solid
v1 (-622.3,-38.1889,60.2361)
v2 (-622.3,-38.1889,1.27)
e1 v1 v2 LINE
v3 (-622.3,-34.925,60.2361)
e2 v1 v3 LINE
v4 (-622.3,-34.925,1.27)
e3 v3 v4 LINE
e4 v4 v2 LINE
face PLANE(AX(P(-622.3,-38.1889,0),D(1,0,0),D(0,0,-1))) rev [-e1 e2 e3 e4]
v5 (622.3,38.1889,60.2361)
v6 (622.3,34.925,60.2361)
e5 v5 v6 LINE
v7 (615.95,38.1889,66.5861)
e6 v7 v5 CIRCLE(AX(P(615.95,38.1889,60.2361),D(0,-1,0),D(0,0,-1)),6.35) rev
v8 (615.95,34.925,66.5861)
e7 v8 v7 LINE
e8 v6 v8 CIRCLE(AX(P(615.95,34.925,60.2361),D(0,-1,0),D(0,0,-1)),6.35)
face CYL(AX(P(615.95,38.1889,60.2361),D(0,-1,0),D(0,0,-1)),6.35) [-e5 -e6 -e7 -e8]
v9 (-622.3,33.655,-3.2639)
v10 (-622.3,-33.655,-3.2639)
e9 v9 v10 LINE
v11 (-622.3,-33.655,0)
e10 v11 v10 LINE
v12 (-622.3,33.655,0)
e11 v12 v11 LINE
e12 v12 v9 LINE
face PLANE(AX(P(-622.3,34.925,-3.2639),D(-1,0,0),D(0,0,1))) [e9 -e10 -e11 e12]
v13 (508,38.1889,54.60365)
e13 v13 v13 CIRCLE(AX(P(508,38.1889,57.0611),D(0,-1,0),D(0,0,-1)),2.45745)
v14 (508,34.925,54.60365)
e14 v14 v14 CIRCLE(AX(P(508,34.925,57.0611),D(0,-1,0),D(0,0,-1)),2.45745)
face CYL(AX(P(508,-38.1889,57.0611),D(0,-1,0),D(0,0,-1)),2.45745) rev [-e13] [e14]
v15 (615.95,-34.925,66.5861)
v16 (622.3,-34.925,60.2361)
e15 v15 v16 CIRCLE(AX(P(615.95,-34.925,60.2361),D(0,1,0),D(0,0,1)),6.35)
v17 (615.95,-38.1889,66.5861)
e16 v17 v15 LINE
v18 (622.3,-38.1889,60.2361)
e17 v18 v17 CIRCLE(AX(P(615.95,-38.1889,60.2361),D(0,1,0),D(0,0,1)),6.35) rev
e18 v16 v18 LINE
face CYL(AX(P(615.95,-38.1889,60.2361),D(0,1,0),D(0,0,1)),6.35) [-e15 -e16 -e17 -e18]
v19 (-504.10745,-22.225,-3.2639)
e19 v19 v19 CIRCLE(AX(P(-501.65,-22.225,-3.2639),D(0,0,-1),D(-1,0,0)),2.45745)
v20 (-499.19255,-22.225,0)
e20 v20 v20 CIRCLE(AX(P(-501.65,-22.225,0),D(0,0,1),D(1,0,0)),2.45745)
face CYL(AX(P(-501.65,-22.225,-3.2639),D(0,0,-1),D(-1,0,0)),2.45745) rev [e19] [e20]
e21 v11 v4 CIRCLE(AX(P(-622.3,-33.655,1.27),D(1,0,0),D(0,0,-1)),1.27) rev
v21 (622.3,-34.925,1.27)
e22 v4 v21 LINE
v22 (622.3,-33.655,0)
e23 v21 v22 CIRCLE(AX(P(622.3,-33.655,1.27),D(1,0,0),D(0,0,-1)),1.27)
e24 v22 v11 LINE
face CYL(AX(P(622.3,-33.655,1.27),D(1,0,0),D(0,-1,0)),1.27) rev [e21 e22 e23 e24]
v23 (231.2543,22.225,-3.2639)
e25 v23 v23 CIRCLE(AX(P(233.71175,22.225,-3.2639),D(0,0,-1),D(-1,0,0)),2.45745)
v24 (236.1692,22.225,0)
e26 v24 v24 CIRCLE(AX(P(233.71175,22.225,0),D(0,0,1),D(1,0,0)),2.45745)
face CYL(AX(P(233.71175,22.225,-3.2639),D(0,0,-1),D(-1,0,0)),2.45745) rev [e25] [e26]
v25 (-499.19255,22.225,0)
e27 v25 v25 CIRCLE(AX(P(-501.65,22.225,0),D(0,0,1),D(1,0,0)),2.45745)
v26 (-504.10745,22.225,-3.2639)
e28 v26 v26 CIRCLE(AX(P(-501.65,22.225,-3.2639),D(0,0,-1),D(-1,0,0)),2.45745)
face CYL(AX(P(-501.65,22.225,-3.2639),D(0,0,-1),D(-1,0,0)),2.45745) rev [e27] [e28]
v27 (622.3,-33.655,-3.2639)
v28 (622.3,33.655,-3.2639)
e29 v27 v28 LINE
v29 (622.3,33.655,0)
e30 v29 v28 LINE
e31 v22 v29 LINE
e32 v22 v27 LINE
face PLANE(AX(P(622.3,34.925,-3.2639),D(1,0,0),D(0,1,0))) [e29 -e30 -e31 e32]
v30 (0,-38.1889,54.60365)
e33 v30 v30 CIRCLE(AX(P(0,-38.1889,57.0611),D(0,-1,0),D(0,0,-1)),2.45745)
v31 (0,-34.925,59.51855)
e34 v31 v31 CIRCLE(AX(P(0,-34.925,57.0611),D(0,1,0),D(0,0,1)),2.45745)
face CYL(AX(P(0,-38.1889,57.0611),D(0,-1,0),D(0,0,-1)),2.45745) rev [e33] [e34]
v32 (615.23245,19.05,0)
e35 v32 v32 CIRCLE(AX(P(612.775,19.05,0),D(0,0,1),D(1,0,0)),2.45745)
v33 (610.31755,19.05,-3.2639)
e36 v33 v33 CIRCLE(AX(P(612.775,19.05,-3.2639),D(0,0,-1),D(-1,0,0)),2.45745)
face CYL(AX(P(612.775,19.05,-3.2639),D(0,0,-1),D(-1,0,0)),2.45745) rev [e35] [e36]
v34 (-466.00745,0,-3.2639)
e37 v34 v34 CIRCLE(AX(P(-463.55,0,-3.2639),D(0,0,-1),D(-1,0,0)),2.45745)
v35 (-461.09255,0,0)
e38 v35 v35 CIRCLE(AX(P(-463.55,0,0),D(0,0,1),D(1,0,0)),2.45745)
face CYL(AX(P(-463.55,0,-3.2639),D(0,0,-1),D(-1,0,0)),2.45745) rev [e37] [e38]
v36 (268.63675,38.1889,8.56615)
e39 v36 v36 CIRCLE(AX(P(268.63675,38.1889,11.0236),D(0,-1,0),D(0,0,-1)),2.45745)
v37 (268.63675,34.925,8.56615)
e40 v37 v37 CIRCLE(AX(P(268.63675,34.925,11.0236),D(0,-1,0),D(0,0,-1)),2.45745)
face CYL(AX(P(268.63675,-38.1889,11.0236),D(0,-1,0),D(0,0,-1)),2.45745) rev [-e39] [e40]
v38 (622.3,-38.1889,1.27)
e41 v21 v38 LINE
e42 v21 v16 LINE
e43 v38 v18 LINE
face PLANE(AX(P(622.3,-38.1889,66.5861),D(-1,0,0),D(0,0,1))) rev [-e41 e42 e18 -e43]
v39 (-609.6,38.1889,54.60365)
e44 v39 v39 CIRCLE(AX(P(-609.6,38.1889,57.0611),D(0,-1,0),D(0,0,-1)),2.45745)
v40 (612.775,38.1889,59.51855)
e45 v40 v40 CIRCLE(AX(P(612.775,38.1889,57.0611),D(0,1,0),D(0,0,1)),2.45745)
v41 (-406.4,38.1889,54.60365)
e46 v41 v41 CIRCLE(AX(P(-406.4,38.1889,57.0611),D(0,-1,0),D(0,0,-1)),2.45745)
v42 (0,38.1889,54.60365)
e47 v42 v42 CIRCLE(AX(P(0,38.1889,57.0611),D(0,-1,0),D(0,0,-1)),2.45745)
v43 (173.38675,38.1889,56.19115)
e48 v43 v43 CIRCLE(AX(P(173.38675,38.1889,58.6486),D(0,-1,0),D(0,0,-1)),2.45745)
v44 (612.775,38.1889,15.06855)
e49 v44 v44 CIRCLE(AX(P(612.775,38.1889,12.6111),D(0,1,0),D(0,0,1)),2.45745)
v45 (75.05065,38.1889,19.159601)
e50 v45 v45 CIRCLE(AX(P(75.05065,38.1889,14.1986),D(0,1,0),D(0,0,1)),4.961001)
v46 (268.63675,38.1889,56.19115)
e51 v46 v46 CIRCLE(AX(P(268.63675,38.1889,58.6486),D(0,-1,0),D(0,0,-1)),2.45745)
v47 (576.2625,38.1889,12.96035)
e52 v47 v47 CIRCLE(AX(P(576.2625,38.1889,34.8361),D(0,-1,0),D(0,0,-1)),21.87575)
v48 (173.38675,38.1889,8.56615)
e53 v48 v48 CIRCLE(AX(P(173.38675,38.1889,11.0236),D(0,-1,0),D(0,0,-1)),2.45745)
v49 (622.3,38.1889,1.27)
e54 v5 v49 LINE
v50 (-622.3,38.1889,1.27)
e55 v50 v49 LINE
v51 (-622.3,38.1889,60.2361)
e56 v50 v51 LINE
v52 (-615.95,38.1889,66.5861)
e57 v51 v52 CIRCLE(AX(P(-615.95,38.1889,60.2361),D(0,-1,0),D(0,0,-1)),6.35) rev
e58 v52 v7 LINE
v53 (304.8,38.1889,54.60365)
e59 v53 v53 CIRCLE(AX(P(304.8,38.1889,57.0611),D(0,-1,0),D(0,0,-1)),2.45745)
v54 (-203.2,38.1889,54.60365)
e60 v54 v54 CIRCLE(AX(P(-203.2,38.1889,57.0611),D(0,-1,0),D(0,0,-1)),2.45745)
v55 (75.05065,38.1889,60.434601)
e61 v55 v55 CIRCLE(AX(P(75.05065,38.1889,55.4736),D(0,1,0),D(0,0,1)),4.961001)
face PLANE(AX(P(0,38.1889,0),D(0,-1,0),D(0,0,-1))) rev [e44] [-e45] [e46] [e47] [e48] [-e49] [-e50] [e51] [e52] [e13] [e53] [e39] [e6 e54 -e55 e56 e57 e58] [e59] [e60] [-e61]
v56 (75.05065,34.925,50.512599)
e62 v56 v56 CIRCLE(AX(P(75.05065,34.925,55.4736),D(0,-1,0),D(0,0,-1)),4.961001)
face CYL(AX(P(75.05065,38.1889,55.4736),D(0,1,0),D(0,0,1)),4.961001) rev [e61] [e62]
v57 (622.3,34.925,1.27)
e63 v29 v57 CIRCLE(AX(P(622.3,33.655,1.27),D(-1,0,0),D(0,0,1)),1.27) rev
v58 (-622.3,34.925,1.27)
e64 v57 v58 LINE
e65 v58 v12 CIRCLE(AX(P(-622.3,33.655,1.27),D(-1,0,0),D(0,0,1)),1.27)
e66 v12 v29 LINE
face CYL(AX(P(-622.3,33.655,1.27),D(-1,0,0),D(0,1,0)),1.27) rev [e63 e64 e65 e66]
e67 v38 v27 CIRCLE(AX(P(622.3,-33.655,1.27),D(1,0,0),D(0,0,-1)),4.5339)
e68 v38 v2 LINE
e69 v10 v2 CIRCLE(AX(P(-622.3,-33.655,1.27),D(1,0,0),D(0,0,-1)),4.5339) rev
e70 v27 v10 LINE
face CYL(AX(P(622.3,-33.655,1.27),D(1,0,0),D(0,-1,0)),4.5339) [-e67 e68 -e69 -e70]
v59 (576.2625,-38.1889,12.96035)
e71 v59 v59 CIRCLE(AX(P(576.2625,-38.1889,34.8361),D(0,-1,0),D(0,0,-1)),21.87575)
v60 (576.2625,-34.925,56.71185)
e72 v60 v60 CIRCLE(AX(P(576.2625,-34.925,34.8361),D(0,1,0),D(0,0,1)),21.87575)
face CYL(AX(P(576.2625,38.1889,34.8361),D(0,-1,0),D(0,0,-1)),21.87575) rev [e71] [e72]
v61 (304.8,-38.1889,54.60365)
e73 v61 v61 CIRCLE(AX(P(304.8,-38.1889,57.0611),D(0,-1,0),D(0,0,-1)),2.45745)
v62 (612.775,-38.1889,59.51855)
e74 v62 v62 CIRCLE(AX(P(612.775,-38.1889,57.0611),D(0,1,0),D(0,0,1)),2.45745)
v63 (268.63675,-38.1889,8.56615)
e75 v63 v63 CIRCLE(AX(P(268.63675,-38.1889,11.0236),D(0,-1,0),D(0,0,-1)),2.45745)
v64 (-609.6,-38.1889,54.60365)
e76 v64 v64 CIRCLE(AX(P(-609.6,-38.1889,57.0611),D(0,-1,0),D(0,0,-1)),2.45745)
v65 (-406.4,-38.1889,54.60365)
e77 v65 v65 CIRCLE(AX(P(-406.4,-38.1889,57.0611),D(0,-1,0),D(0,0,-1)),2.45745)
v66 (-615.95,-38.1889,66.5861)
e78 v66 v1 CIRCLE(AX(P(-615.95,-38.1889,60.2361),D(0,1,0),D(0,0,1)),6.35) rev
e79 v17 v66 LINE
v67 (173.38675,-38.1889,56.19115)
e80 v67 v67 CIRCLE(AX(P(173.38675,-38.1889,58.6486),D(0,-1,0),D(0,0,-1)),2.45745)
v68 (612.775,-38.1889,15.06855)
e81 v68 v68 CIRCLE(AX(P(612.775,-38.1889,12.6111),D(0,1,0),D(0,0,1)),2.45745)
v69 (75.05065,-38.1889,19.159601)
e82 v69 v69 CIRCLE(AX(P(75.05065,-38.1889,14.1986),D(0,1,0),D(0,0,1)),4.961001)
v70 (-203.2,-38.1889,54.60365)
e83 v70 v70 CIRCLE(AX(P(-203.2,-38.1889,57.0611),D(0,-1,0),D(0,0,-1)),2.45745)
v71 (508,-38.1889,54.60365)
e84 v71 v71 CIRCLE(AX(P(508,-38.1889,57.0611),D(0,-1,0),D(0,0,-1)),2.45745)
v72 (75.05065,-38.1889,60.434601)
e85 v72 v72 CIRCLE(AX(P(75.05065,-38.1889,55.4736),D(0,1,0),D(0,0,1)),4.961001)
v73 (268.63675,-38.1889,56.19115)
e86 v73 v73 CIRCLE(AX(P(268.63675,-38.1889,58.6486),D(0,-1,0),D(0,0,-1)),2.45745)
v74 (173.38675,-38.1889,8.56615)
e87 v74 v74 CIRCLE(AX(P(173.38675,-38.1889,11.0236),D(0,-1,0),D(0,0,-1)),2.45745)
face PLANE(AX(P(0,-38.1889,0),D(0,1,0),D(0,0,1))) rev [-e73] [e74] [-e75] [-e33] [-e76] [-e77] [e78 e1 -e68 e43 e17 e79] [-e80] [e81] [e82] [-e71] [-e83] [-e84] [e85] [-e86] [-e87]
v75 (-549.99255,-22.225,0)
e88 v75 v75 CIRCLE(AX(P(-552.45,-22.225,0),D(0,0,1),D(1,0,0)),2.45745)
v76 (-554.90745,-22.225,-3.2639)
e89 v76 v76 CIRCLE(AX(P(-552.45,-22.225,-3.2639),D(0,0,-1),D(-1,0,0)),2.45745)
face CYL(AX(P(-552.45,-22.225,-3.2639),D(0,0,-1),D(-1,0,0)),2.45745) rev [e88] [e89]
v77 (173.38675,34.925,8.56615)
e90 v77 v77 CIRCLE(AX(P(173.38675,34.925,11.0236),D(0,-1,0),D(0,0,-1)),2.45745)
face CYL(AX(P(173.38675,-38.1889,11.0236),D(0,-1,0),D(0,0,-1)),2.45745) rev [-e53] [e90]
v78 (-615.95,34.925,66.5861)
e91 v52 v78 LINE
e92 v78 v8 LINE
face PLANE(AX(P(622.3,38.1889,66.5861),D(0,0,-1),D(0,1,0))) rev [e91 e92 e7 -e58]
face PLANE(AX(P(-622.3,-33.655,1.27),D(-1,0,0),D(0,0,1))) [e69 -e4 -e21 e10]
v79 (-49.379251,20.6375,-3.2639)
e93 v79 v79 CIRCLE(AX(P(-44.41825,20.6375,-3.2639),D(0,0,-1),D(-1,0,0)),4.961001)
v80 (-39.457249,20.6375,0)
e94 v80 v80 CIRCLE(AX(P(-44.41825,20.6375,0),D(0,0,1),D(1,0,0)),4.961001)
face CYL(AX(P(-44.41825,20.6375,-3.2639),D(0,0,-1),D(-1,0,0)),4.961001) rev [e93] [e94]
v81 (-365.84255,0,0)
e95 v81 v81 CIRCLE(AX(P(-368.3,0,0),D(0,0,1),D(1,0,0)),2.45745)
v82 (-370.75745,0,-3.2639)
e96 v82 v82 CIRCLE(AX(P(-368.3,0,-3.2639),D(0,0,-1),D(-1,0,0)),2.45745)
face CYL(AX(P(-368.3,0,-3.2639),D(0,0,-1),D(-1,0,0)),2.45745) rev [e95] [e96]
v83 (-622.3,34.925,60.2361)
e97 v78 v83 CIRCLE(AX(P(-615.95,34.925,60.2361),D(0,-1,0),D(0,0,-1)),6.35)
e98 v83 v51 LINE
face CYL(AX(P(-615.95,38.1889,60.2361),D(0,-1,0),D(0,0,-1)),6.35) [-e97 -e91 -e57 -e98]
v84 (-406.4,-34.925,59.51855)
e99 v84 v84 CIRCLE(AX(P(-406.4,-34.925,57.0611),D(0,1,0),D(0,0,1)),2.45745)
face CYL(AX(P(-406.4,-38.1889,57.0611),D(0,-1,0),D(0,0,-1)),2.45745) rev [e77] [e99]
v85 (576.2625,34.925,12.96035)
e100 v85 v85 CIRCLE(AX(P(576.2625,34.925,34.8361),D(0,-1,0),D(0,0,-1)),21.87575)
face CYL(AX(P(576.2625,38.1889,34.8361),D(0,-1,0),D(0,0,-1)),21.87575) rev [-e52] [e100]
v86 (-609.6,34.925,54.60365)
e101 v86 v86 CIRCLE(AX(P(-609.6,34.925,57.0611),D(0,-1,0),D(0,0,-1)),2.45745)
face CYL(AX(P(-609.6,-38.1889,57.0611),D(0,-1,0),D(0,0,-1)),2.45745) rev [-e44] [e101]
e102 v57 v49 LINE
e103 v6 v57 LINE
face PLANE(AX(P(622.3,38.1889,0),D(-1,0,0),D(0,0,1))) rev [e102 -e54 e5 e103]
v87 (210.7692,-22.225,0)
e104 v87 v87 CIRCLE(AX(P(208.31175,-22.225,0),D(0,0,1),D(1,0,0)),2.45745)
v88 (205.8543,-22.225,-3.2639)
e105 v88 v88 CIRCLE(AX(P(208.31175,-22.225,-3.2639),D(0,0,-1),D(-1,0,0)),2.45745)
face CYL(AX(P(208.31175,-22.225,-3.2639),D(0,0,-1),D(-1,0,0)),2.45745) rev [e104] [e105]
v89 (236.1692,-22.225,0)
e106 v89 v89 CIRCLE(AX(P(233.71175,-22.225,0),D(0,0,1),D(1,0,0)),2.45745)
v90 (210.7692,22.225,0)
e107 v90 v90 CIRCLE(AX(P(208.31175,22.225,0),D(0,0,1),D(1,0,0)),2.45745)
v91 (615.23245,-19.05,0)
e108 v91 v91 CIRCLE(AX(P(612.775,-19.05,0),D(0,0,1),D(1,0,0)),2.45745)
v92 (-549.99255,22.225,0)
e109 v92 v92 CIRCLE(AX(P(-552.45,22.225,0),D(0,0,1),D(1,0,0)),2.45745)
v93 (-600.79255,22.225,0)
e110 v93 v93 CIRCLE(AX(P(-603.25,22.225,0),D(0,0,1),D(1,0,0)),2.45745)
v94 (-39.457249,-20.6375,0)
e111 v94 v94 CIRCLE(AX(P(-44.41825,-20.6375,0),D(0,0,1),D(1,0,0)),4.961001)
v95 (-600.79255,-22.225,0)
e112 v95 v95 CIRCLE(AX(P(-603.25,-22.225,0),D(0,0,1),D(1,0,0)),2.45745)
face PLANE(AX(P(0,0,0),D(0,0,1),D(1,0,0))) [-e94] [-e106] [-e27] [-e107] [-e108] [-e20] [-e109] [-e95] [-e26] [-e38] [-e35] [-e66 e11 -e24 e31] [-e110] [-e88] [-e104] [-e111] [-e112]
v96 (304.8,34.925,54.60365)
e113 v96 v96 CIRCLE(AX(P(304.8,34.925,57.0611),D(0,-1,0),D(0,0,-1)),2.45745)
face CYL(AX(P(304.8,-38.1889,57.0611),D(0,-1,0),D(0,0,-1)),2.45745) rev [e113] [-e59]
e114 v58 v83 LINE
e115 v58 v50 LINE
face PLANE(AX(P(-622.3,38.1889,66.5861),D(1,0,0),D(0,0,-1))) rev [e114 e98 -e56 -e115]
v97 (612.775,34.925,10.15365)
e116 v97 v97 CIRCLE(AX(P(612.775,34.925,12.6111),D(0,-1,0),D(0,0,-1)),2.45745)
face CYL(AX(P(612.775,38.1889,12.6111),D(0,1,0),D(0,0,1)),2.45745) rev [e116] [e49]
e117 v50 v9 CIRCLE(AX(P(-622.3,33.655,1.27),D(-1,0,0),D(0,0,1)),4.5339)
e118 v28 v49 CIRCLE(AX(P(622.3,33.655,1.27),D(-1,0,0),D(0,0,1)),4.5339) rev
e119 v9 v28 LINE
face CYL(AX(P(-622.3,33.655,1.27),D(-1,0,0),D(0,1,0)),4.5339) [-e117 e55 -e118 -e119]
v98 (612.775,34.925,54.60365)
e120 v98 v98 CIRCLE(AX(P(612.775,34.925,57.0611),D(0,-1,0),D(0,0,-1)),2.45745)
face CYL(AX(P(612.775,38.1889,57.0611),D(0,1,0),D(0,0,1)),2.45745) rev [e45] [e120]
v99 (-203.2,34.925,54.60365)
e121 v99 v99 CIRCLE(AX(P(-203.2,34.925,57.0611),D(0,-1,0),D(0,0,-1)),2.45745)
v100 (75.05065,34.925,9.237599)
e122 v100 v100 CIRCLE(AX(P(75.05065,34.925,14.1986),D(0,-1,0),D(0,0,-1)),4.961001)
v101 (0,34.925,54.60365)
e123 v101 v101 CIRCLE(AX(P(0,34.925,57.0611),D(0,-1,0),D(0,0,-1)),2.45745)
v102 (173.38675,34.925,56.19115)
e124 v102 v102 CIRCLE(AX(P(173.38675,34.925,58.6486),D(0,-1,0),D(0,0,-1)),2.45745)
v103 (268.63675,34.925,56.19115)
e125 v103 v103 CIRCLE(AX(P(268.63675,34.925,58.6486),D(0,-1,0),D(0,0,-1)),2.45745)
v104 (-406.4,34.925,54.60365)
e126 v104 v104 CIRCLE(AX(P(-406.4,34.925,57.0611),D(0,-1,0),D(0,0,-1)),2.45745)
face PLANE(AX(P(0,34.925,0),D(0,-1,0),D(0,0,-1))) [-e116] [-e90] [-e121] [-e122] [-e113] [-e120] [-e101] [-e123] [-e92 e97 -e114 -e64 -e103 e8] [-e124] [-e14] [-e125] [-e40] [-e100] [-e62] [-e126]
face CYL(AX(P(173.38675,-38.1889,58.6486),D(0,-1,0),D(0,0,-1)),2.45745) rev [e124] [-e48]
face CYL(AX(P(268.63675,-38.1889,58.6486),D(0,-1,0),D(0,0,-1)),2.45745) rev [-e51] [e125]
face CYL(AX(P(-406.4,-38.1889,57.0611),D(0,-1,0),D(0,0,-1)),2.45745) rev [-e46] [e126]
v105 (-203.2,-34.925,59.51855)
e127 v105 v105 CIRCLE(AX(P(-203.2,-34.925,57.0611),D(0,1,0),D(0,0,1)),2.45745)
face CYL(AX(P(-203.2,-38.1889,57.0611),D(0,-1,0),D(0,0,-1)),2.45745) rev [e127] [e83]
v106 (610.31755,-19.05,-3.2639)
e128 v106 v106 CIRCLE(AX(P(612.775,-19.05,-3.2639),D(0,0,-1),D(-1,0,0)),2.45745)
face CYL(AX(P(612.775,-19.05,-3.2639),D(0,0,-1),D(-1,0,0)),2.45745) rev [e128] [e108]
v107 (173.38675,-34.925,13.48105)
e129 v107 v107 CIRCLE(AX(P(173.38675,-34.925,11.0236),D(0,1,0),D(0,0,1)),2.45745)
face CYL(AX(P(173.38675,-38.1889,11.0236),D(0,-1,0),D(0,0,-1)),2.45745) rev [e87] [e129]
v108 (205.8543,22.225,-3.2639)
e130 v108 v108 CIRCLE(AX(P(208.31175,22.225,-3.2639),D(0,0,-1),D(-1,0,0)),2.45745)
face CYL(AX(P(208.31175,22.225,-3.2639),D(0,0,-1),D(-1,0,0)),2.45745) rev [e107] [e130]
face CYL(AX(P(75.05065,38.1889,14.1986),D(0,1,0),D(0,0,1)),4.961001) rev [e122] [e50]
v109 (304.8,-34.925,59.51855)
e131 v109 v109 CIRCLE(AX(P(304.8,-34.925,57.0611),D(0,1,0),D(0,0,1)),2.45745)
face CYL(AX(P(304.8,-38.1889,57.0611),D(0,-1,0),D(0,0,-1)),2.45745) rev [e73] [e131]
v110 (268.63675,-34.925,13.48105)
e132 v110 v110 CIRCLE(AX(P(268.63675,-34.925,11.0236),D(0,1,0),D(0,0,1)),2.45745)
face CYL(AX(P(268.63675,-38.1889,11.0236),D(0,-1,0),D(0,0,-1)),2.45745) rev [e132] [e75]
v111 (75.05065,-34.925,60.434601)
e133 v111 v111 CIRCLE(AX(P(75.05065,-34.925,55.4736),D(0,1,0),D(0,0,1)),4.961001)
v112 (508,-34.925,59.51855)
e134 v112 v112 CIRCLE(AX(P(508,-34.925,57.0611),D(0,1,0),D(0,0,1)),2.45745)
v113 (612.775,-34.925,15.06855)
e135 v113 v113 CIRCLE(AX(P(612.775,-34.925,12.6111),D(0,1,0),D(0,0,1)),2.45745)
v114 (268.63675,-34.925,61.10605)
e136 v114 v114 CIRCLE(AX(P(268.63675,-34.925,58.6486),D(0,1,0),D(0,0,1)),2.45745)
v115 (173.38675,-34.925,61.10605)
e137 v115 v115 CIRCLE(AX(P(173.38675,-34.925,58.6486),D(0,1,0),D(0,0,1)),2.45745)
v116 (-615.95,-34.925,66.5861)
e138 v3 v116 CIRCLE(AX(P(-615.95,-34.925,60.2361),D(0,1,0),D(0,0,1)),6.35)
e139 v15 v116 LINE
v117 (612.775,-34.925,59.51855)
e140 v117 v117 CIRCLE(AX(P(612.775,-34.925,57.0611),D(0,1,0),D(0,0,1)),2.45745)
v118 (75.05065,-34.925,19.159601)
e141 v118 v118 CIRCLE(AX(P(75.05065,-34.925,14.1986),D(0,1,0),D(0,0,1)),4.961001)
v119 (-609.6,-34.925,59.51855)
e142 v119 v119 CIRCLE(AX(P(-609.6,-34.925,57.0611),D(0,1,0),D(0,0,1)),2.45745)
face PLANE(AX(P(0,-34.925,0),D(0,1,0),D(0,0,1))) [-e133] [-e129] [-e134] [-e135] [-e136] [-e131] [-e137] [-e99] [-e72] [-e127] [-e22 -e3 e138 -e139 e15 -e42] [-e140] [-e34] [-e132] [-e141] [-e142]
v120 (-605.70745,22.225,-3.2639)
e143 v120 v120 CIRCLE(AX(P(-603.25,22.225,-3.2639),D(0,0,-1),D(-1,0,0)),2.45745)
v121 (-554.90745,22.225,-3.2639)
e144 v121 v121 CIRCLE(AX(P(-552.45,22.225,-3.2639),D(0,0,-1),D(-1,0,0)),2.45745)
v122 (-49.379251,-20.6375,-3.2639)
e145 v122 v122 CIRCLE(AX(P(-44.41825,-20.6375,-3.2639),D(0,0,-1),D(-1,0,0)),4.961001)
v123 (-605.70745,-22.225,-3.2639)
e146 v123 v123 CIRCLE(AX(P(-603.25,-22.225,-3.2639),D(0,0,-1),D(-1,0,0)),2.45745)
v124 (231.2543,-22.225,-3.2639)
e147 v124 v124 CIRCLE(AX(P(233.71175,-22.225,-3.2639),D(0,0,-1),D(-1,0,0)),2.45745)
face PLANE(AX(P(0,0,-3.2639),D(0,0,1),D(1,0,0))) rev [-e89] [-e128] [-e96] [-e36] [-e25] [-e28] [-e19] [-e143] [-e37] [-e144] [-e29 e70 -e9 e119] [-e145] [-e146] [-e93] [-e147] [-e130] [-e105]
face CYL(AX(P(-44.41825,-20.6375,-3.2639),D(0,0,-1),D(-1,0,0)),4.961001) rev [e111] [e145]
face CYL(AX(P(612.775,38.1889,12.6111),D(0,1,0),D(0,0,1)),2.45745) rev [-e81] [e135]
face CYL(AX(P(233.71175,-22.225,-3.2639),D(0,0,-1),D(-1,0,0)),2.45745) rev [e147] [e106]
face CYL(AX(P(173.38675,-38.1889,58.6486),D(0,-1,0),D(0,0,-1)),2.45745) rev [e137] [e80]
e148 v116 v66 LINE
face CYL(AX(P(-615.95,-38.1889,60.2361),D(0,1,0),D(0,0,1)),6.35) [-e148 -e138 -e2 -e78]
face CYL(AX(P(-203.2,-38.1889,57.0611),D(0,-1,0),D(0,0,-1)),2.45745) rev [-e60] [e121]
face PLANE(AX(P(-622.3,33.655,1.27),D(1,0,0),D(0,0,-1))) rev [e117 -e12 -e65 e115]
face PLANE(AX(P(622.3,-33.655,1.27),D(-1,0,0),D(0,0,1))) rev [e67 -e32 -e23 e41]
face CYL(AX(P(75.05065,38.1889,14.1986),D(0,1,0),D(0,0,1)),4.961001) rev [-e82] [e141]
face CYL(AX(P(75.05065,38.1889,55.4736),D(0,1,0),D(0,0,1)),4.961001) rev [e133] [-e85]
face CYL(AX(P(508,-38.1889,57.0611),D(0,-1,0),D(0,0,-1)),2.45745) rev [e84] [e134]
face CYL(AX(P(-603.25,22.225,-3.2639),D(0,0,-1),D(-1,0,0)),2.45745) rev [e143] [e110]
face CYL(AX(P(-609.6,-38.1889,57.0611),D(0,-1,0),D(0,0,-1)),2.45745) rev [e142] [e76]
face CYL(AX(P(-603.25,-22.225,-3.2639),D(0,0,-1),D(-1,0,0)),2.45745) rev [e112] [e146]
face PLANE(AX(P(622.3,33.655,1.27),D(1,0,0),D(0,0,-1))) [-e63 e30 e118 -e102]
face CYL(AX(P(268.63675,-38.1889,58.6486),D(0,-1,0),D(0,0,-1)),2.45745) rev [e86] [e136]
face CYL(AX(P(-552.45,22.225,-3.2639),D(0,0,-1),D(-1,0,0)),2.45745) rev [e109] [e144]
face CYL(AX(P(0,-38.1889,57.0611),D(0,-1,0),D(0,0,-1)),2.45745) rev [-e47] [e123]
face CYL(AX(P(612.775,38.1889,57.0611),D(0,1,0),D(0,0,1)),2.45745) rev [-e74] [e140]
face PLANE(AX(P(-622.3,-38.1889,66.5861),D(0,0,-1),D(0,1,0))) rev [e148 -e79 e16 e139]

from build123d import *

# Parameters (mm, degrees)
SKETCH2_W                        = 1244.6
SKETCH2_H                        = 69.85
BASE_FLANGE1_DEPTH               = 3.2639
EDGE_FLANGE1_STRIP_W             = 15.5956
EDGE_FLANGE1_STRIP_H             = 3.2639
EDGE_FLANGE1_STRIP_CUT_DEPTH     = 1244.6
EDGE_FLANGE1_STRIP_2_W           = 15.5956
EDGE_FLANGE1_STRIP_2_H           = 3.2639
EDGE_FLANGE1_STRIP_CUT_2_DEPTH   = 1244.6
EDGE_FLANGE1_DEPTH               = 1244.6
EDGE_FLANGE1_BEND_DEPTH          = 1244.6
F_10_0_1935_DIAMETER_HOLE1_D     = 4.9149
SKETCH28_R                       = 21.87575
CUT_EXTRUDE1_DEPTH               = 631.49549328
F_10_0_1935_DIAMETER_HOLE5_D     = 4.9149
F_10_0_1935_DIAMETER_HOLE6_D     = 4.9149
F_10_0_1935_DIAMETER_HOLE7_D     = 4.9149
F_25_64_0_39063_DIAMETER_HOLE1_D = 9.922002
F_25_64_0_39063_DIAMETER_HOLE2_D = 9.922002
F_10_0_1935_DIAMETER_HOLE9_D     = 4.9149
LPATTERN1_COUNT                  = 13
LPATTERN1_PITCH                  = 101.6
FILLET3_R                        = 6.35
F_10_0_1935_DIAMETER_HOLE10_D    = 4.9149
F_10_0_1935_DIAMETER_HOLE11_D    = 4.9149


# Sheet-metal steps are written as plain solids
with BuildPart() as part:
    # Sketch2 → Base-Flange1 (new body)
    with BuildSketch(Plane.XY):
        Rectangle(SKETCH2_W, SKETCH2_H)
    extrude(amount=-BASE_FLANGE1_DEPTH)

    # Edge-Flange1 strip (across the edge) → Edge-Flange1 strip cut (cut)
    with BuildSketch(Plane(origin=(622.3, 34.925, 0), x_dir=(0, -1, 0), z_dir=(-1, 0, 0))):
        with Locations((-6.5278, -1.63195)):
            Rectangle(EDGE_FLANGE1_STRIP_W, EDGE_FLANGE1_STRIP_H)
    extrude(amount=EDGE_FLANGE1_STRIP_CUT_DEPTH, mode=Mode.SUBTRACT)

    # Edge-Flange1 strip 2 (across the edge) → Edge-Flange1 strip cut 2 (cut)
    with BuildSketch(Plane(origin=(-622.3, -34.925, 0), x_dir=(0, 1, 0), z_dir=(1, 0, 0))):
        with Locations((-6.5278, -1.63195)):
            Rectangle(EDGE_FLANGE1_STRIP_2_W, EDGE_FLANGE1_STRIP_2_H)
    extrude(amount=EDGE_FLANGE1_STRIP_CUT_2_DEPTH, mode=Mode.SUBTRACT)

    # Edge-Flange1 section (across the edge) → Edge-Flange1 (add)
    with BuildSketch(Plane(origin=(622.3, 34.925, 0), x_dir=(0, -1, 0), z_dir=(-1, 0, 0))):
        with BuildLine():
            Line((-3.2639, 1.27), (-3.2639, 66.5861))
            Line((-3.2639, 66.5861), (0, 66.5861))
            Line((0, 66.5861), (0, 1.27))
            ThreePointArc((0, 1.27), (0.371974388, 0.371974388), (1.27, 0))
            Line((1.27, 0), (1.27, -3.2639))
            ThreePointArc((1.27, -3.2639), (-1.935951435, -1.935951435), (-3.2639, 1.27))
        make_face()
    extrude(amount=EDGE_FLANGE1_DEPTH)

    # Edge-Flange1 section 2 (across the edge) → Edge-Flange1 bend (add)
    with BuildSketch(Plane(origin=(-622.3, -34.925, 0), x_dir=(0, 1, 0), z_dir=(1, 0, 0))):
        with BuildLine():
            Line((-3.2639, 1.27), (-3.2639, 66.5861))
            Line((-3.2639, 66.5861), (0, 66.5861))
            Line((0, 66.5861), (0, 1.27))
            ThreePointArc((0, 1.27), (0.371974388, 0.371974388), (1.27, 0))
            Line((1.27, 0), (1.27, -3.2639))
            ThreePointArc((1.27, -3.2639), (-1.935951435, -1.935951435), (-3.2639, 1.27))
        make_face()
    extrude(amount=EDGE_FLANGE1_BEND_DEPTH)

    # #10 (0.1935) Diameter Hole1 (through all)
    with Locations(Plane(origin=(0, 0, -3.2639), x_dir=(-1, 0, 0), z_dir=(0, 0, -1))):
        with Locations((552.45, 22.225), (603.25, 22.225), (603.25, -22.225), (552.45, -22.225), (501.65, -22.225), (501.65, 22.225)):
            Hole(F_10_0_1935_DIAMETER_HOLE1_D / 2)

    # Sketch28 → Cut-Extrude1 (cut, through all)
    with BuildSketch(Plane.XZ.offset(38.1889)):
        with Locations(Location((576.2625, 34.8361, 0), (0, 0, 270))):
            Circle(SKETCH28_R)
    extrude(amount=-CUT_EXTRUDE1_DEPTH, mode=Mode.SUBTRACT)

    # #10 (0.1935) Diameter Hole5 (through all)
    with Locations(Plane(origin=(0, -38.1889, 0), x_dir=(-1, 0, 0), z_dir=(0, -1, 0))):
        with Locations((-173.38675, -58.6486), (-173.38675, -11.0236), (-268.63675, -58.6486), (-268.63675, -11.0236)):
            Hole(F_10_0_1935_DIAMETER_HOLE5_D / 2)

    # #10 (0.1935) Diameter Hole6 (through all)
    with Locations(Plane(origin=(0, 0, -3.2639), x_dir=(-1, 0, 0), z_dir=(0, 0, -1))):
        with Locations((-233.71175, 22.225), (-208.31175, 22.225), (-208.31175, -22.225), (-233.71175, -22.225)):
            Hole(F_10_0_1935_DIAMETER_HOLE6_D / 2)

    # #10 (0.1935) Diameter Hole7 (through all)
    with Locations(Plane(origin=(0, 0, -3.2639), x_dir=(-1, 0, 0), z_dir=(0, 0, -1))):
        with Locations((463.55, 0), (368.3, 0)):
            Hole(F_10_0_1935_DIAMETER_HOLE7_D / 2)

    # 25/64 (0.39063) Diameter Hole1 (through all)
    with Locations(Plane(origin=(0, 0, -3.2639), x_dir=(-1, 0, 0), z_dir=(0, 0, -1))):
        with Locations((44.41825, -20.6375), (44.41825, 20.6375)):
            Hole(F_25_64_0_39063_DIAMETER_HOLE1_D / 2)

    # 25/64 (0.39063) Diameter Hole2 (through all)
    with Locations(Plane(origin=(0, 38.1889, 0), x_dir=(1, 0, 0), z_dir=(0, 1, 0))):
        with Locations((75.05065, -14.1986), (75.05065, -55.4736)):
            Hole(F_25_64_0_39063_DIAMETER_HOLE2_D / 2)

    # #10 (0.1935) Diameter Hole9 (through all)
    with Locations(Plane(origin=(0, -38.1889, 0), x_dir=(-1, 0, 0), z_dir=(0, -1, 0))):
        with Locations((609.6, -57.0611)):
            f_10_0_1935_diameter_hole9 = Hole(F_10_0_1935_DIAMETER_HOLE9_D / 2)

    # LPattern1: #10 (0.1935) Diameter Hole9 ×13, 7 skipped
    with Locations(*[(i * LPATTERN1_PITCH, 0, 0) for i in range(1, LPATTERN1_COUNT) if i not in (1, 3, 5, 7, 8, 10, 12)]):
        add(f_10_0_1935_diameter_hole9, mode=Mode.SUBTRACT)

    # Fillet3
    fillet3_edges = [part.edges().sort_by_distance(p)[0] for p in [
        (622.3, 36.55695, 66.5861),
        (-622.3, 36.55695, 66.5861),
        (-622.3, -36.55695, 66.5861),
        (622.3, -36.55695, 66.5861),
    ]]
    fillet(fillet3_edges, radius=FILLET3_R)

    # #10 (0.1935) Diameter Hole10 (through all)
    with Locations(Plane(origin=(0, 38.1889, 0), x_dir=(1, 0, 0), z_dir=(0, 1, 0))):
        with Locations((612.775, -12.6111), (612.775, -57.0611)):
            Hole(F_10_0_1935_DIAMETER_HOLE10_D / 2)

    # #10 (0.1935) Diameter Hole11 (through all)
    with Locations(Plane(origin=(0, 0, -3.2639), x_dir=(-1, 0, 0), z_dir=(0, 0, -1))):
        with Locations((-612.775, 19.05), (-612.775, -19.05)):
            Hole(F_10_0_1935_DIAMETER_HOLE11_D / 2)


solid = part.part
